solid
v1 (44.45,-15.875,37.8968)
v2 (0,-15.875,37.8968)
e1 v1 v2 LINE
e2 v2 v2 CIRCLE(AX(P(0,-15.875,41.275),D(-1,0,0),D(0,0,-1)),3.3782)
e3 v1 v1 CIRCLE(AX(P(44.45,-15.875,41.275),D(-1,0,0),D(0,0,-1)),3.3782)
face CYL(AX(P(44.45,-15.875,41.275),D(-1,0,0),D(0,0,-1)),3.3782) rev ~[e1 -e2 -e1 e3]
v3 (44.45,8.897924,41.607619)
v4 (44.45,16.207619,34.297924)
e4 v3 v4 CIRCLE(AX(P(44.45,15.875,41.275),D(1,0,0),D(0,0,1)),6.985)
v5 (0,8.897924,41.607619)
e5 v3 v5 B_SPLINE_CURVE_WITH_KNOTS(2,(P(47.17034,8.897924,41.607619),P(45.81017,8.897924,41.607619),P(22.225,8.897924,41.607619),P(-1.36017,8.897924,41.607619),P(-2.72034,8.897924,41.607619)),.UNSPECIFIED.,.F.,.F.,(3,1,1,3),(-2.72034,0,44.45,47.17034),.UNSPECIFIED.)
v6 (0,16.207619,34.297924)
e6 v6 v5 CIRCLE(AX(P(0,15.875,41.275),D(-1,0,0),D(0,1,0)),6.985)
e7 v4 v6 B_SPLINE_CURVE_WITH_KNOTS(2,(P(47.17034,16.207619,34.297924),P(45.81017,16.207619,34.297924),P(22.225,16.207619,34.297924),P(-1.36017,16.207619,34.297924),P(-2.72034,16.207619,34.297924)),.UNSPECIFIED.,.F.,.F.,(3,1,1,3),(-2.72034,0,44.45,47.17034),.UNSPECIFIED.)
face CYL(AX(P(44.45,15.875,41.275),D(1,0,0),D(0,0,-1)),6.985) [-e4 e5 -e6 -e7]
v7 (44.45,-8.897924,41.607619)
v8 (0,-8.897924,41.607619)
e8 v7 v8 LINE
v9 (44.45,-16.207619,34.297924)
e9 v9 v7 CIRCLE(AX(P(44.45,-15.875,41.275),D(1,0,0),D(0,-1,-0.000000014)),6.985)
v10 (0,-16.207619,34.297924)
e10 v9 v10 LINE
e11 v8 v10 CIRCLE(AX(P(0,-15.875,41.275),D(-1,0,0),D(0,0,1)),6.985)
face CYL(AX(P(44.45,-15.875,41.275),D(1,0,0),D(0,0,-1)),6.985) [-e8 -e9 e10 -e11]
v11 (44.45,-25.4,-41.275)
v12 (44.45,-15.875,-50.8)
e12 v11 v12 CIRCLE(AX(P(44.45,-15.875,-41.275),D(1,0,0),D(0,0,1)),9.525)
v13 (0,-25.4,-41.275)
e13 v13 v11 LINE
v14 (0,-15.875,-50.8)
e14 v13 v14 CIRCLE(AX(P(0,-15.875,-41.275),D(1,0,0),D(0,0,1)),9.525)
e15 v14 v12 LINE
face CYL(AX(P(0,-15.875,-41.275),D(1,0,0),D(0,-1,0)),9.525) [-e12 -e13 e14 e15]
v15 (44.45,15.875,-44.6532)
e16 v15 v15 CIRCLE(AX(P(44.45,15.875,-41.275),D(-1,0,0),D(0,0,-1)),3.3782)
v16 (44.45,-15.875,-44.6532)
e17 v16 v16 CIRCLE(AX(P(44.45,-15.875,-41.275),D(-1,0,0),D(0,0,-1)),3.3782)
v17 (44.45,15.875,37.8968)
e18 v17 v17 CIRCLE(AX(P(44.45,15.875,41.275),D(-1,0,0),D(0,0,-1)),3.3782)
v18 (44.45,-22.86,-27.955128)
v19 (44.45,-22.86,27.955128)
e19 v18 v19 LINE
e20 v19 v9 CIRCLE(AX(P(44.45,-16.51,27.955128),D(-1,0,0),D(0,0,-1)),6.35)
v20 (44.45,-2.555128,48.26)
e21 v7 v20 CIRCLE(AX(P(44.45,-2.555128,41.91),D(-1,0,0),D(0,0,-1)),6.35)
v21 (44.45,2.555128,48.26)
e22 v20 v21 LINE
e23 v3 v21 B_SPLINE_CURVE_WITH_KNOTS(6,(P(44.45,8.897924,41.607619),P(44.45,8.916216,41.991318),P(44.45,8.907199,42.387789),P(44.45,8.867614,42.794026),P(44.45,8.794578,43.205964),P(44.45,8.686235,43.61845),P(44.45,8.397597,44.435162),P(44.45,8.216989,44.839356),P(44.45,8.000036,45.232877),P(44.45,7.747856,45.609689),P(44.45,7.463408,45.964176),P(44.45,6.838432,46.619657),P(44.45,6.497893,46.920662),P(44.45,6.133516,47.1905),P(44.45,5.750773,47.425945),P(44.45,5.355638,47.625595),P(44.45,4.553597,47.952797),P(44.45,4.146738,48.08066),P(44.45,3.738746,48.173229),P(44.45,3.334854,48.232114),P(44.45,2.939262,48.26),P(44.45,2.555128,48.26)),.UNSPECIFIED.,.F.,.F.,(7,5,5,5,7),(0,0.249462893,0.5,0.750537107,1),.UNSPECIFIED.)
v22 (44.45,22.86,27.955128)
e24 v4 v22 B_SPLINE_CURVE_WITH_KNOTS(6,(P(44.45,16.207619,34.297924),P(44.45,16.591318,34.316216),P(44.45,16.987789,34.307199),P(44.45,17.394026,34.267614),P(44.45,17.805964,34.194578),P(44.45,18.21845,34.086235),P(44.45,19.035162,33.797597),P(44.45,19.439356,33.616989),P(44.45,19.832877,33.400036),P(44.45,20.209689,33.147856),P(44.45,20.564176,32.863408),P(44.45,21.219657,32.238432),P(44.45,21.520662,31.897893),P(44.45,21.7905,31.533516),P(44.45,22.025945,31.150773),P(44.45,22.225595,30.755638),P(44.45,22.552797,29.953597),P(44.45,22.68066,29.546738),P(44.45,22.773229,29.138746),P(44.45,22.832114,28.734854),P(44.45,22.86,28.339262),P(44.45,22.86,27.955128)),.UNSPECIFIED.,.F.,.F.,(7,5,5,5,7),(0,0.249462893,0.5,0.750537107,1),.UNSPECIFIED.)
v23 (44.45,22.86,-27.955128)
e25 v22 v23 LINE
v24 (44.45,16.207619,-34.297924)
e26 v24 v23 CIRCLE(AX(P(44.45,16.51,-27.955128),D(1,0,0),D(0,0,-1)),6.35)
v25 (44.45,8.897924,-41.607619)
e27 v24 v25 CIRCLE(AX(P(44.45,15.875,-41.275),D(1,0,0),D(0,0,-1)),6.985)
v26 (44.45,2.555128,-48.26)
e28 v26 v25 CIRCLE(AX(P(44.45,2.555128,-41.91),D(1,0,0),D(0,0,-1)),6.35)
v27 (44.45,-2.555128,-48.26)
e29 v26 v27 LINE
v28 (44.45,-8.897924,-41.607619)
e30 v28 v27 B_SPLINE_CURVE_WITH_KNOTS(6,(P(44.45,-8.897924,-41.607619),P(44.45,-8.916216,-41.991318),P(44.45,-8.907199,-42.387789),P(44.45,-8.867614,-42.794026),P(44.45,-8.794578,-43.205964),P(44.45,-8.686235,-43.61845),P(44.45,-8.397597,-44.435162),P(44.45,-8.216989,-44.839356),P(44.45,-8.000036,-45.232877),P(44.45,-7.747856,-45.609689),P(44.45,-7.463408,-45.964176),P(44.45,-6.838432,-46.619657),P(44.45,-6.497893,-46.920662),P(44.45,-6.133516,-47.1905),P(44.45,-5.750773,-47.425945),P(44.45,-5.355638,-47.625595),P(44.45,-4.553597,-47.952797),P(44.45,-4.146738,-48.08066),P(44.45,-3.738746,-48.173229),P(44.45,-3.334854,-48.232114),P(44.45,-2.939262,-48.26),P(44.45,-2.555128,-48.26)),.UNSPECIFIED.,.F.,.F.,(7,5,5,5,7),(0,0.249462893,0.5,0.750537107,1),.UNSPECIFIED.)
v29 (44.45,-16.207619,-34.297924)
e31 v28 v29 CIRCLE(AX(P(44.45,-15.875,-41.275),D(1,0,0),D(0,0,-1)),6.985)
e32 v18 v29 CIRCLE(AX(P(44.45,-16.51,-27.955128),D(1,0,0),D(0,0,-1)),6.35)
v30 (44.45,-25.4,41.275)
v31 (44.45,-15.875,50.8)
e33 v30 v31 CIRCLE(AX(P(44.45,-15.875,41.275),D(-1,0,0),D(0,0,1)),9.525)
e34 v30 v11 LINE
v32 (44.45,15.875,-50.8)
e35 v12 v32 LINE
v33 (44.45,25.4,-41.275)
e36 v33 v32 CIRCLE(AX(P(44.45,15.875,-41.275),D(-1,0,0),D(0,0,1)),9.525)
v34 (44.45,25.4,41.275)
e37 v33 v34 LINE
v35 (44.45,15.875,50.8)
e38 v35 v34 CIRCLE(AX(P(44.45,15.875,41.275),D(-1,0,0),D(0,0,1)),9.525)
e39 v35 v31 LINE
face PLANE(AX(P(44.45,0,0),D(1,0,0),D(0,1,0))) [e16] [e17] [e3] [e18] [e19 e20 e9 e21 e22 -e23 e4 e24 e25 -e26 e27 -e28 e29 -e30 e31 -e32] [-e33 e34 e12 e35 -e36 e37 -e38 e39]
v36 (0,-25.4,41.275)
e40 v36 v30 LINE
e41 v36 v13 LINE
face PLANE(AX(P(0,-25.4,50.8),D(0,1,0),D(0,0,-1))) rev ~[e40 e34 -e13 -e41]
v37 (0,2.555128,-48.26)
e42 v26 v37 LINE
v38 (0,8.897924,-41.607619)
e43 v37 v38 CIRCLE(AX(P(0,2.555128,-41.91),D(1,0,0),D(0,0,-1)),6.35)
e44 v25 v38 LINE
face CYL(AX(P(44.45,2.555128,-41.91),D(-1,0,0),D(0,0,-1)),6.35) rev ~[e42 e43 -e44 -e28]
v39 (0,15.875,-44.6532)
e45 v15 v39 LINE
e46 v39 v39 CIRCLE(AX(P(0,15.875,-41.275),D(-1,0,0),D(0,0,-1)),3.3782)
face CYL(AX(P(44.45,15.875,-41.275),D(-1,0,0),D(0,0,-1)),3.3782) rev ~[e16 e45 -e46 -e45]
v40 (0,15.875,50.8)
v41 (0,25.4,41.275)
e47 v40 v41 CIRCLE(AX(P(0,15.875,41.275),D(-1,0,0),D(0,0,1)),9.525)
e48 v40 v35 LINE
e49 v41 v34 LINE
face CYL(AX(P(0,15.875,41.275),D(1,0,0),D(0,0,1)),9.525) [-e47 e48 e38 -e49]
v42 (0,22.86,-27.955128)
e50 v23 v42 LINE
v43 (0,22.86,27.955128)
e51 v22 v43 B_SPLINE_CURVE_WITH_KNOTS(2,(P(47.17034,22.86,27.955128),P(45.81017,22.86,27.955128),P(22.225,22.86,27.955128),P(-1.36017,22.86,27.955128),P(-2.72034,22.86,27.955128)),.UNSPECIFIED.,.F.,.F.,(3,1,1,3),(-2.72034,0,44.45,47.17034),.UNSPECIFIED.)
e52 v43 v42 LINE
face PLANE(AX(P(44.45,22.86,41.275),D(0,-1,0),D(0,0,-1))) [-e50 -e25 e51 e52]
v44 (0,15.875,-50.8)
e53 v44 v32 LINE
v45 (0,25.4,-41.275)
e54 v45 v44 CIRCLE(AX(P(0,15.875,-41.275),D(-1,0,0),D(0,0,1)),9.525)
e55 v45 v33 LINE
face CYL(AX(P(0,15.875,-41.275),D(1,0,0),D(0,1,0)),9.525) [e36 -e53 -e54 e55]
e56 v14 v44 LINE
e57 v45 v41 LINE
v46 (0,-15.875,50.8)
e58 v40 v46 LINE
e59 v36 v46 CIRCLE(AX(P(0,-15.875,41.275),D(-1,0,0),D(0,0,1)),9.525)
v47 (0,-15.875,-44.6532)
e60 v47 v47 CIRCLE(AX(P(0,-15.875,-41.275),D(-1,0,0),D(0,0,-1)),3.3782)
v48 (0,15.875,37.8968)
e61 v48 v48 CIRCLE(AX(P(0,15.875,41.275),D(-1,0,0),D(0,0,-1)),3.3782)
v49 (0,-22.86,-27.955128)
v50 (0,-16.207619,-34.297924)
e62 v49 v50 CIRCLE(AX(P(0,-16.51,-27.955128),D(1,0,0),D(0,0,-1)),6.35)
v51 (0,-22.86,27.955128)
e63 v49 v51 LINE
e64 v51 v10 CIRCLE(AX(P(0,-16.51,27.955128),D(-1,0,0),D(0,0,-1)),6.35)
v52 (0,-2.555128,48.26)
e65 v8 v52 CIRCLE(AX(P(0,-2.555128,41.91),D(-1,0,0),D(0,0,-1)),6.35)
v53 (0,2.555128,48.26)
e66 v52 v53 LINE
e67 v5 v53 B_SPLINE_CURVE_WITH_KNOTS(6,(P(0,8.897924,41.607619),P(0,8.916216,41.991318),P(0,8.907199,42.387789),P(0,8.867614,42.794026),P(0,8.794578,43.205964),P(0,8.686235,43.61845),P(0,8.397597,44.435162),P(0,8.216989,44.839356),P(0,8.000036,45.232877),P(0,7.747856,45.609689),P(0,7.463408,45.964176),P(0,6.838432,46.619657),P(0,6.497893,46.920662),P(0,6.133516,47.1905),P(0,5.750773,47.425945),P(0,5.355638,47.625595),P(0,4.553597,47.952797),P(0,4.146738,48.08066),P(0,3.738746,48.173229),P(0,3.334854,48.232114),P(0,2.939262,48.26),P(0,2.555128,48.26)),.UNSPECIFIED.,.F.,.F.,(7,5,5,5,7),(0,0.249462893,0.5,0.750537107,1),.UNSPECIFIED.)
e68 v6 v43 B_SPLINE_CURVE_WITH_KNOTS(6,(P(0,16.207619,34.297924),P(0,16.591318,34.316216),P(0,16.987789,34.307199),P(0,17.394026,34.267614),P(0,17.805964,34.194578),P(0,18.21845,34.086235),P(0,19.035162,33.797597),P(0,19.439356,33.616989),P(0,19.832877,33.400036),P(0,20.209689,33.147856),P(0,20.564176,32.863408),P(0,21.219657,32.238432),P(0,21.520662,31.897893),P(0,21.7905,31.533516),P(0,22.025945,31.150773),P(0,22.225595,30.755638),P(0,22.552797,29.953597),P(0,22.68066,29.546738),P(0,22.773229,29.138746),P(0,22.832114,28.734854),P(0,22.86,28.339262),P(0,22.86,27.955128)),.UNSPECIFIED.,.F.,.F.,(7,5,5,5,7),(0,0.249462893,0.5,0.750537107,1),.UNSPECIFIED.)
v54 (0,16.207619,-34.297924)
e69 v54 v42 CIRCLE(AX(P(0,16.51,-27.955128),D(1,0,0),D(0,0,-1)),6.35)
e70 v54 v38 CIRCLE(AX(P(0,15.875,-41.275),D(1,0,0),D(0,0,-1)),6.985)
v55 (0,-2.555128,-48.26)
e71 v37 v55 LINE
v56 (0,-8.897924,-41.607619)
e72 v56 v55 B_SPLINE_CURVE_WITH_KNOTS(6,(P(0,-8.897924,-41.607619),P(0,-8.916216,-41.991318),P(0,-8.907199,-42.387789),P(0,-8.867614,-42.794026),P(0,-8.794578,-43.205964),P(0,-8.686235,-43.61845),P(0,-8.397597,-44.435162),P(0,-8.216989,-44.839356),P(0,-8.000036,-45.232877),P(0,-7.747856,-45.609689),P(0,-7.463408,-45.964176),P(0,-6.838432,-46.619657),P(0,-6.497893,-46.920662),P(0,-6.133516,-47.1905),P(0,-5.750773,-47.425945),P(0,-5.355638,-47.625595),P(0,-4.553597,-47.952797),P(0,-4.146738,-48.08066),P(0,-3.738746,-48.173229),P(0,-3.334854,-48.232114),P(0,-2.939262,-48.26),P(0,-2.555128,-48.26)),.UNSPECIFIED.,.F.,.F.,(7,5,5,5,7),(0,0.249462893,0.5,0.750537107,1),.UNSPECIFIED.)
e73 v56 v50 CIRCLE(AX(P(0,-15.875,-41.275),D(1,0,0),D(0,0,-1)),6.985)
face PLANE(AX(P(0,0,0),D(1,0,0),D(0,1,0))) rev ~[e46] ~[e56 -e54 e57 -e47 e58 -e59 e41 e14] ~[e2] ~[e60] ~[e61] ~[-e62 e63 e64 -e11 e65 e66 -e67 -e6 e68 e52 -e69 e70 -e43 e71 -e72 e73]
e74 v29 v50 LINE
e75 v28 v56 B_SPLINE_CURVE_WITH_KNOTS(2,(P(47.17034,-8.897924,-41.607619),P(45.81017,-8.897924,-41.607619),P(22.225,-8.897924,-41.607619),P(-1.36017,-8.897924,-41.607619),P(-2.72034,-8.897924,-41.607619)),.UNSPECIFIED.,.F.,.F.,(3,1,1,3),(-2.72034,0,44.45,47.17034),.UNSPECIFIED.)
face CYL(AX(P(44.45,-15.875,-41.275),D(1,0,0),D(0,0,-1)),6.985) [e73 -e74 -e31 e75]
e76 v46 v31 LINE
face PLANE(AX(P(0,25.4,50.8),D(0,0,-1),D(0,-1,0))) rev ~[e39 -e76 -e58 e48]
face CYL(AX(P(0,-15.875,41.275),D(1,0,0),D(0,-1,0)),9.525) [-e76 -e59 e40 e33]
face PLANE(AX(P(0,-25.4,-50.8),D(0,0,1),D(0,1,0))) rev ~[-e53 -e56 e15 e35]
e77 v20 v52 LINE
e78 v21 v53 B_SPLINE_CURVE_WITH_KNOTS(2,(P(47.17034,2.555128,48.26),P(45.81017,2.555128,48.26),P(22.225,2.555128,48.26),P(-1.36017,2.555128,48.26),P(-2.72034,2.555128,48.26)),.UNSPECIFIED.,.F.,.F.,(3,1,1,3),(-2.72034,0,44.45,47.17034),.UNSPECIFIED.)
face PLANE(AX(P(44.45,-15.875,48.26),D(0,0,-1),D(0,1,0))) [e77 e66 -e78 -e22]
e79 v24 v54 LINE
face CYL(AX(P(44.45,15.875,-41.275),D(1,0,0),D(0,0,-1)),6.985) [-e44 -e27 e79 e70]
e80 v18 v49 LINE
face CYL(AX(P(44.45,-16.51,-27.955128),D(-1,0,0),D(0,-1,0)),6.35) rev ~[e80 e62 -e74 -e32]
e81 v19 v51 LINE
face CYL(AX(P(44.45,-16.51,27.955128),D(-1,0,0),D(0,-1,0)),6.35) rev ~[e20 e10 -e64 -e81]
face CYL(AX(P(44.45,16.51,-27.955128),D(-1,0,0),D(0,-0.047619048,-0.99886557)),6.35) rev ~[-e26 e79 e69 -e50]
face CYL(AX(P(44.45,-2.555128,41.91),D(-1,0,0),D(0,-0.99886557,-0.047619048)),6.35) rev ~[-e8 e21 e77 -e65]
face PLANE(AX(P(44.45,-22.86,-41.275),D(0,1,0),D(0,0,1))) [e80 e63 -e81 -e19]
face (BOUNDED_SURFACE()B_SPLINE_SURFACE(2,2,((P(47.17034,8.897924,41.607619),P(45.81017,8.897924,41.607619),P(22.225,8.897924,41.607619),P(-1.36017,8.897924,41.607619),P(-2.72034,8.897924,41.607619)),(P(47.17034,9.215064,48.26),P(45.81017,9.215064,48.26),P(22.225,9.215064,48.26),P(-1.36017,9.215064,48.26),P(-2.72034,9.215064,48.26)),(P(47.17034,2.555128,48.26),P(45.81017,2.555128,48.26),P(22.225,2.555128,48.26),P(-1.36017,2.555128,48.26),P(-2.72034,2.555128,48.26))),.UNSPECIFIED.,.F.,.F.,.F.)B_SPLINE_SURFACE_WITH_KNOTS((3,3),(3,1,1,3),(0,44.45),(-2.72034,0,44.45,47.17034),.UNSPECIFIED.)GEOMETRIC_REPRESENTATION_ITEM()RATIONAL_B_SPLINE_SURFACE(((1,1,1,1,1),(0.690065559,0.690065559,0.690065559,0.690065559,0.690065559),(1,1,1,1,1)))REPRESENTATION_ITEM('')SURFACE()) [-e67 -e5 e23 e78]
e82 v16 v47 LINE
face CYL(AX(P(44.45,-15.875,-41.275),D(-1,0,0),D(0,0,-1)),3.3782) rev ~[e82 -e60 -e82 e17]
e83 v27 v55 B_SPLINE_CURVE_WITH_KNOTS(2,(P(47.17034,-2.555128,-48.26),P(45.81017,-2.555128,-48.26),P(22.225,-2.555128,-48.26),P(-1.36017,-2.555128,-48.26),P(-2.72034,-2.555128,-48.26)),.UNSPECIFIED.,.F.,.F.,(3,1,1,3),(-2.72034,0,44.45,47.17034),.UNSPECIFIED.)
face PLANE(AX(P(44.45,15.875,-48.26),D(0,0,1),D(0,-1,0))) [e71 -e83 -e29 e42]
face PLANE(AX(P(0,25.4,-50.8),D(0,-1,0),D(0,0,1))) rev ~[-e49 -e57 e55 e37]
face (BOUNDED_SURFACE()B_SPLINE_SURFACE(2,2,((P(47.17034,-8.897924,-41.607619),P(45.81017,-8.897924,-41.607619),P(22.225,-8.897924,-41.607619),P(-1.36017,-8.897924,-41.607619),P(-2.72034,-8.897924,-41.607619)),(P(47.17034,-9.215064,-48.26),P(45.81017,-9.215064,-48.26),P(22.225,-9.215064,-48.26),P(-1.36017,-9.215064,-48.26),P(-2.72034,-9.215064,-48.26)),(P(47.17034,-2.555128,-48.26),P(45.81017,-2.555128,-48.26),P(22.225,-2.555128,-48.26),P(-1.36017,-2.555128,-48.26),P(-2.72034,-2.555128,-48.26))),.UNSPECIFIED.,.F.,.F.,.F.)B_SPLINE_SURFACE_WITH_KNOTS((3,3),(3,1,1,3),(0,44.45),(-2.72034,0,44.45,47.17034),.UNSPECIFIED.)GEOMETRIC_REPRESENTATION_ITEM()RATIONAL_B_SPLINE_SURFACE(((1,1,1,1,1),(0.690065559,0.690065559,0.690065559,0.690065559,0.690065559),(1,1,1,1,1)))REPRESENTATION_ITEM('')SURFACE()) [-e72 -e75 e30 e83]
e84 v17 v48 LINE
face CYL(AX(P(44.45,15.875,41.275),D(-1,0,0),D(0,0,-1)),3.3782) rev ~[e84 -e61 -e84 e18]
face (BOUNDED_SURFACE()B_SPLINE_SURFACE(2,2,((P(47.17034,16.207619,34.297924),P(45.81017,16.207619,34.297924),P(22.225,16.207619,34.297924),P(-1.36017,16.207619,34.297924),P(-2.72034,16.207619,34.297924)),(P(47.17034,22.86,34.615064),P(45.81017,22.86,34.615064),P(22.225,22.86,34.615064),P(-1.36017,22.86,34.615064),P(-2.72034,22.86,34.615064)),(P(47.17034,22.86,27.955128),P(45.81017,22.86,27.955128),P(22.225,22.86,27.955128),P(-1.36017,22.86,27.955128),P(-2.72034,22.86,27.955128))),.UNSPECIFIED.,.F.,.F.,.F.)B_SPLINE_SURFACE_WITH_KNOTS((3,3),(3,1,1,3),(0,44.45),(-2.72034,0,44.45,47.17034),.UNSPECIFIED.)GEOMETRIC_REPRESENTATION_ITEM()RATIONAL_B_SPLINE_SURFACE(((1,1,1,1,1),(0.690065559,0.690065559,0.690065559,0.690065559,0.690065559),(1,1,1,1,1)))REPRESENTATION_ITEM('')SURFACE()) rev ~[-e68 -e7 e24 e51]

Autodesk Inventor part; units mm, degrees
ref_plane "YZ Plane" through (0, 0, 0) normal (1, 0, 0) x (0, 1, 0)
ref_plane "XZ Plane" through (0, 0, 0) normal (0, 1, 0) x (-1, 0, 0)
ref_plane "XY Plane" through (0, 0, 0) normal (0, 0, 1) x (1, 0, 0)
sketch "Sketch1" plane through (0, 0, 0) normal (1, 0, 0) x (0, 1, 0)
  line L0 (-25.4, -50.8) -> (25.4, -50.8)
  line L1 (25.4, -50.8) -> (25.4, 50.8)
  line L2 (25.4, 50.8) -> (-25.4, 50.8)
  line L3 (-25.4, 50.8) -> (-25.4, -50.8)
  line L4 (-25.4, -50.8) -> (25.4, 50.8) construction
  line L5 (25.4, -50.8) -> (-25.4, 50.8) construction
  point P0 (0, 0)
  dimension "d0" = 50.8
  dimension "d1" = 101.6
extrude "Extrusion1" add sketch "Sketch1" along normal blind 44.45
fillet "Fillet2" radius 9.525 4 edges at (22.225, 25.4, 50.8) (22.225, -25.4, 50.8) (22.225, -25.4, -50.8) (22.225, 25.4, -50.8)
sketch "Sketch5" plane through (44.45, 0, 0) normal (1, 0, 0) x (0, 0, -1)
  arc A0 (50.8, 15.875) -> (41.275, 25.4) centre (41.275, 15.875) ccw projected
  line L0 (41.275, 25.4) -> (-41.275, 25.4) projected
  arc A1 (-41.275, 25.4) -> (-50.8, 15.875) centre (-41.275, 15.875) ccw projected
  line L1 (-50.8, 15.875) -> (-50.8, -15.875) projected
  arc A2 (-50.8, -15.875) -> (-41.275, -25.4) centre (-41.275, -15.875) ccw projected
  line L2 (-41.275, -25.4) -> (41.275, -25.4) projected
  arc A3 (41.275, -25.4) -> (50.8, -15.875) centre (41.275, -15.875) ccw projected
  line L3 (50.8, -15.875) -> (50.8, 15.875) projected
  point P0 (0, 0)
hole "Hole2" at (44.45, -15.875, -41.275) at (44.45, -15.875, 41.275) at (44.45, 15.875, 41.275) at (44.45, 15.875, -41.275) direction (-1, 0, 0) diameter 6.7564 end through all clearance for "Flat Head Machine Screw (82)" size "1/4" standard "Ansi Unified Screw Threads"
sketch "Sketch6" plane through (44.45, 0, 0) normal (1, 0, 0) x (0, 0, -1)
  circle A0 centre (41.275, -15.875) radius 3.3782 projected
  circle A1 centre (41.275, -15.875) radius 6.985
  circle A2 centre (41.275, 15.875) radius 3.3782 projected
  circle A3 centre (41.275, 15.875) radius 6.985
  circle A4 centre (-41.275, 15.875) radius 3.3782 projected
  circle A5 centre (-41.275, 15.875) radius 6.985
  circle A6 centre (-41.275, -15.875) radius 3.3782 projected
  circle A7 centre (-41.275, -15.875) radius 6.985
  line L0 (-48.26, 22.86) -> (48.26, 22.86)
  line L1 (48.26, 22.86) -> (48.26, -22.86)
  line L2 (48.26, -22.86) -> (-48.26, -22.86)
  line L3 (-48.26, -22.86) -> (-48.26, 22.86)
  line L4 (-48.26, 22.86) -> (48.26, -22.86) construction
  line L5 (48.26, 22.86) -> (-48.26, -22.86) construction
  arc A8 (41.275, -25.4) -> (50.8, -15.875) centre (41.275, -15.875) ccw projected
  arc A9 (50.8, 15.875) -> (41.275, 25.4) centre (41.275, 15.875) ccw projected
  arc A10 (-41.275, 25.4) -> (-50.8, 15.875) centre (-41.275, 15.875) ccw projected
  arc A11 (-50.8, -15.875) -> (-41.275, -25.4) centre (-41.275, -15.875) ccw projected
  line L6 (50.8, -15.875) -> (50.8, 15.875) projected
  line L7 (41.275, 25.4) -> (-41.275, 25.4) projected
  point P0 (0, 0)
  point P1 (-48.26, 15.875)
  point P2 (-48.26, -15.875)
  point P3 (-41.275, -22.86)
  point P4 (41.275, -22.86)
  point P5 (48.26, -15.875)
  point P6 (48.26, 15.875)
  point P7 (41.275, 22.86)
  point P8 (-41.275, 22.86)
  dimension "d24" = 2.54
  dimension "d27" = 2.54
extrude "Extrusion2" cut sketch "Sketch6" against normal through all contours A1 L2 A7 L3 A5 L0 A3 L1
fillet "Fillet3" radius 6.35 8 edges at (22.225, 15.875, 48.26) (22.225, 22.86, 41.275) (22.225, -22.86, -41.275) (22.225, -15.875, -48.26) (22.225, 15.875, -48.26) (22.225, 22.86, -41.275) (22.225, -22.86, 41.275) (22.225, -15.875, 48.26)
equation "\"d2\" = Base"
equation "\"Base\" = 44.45"
properties part number "NASA-20-MM-MB-01" material "Aluminum 6061"
